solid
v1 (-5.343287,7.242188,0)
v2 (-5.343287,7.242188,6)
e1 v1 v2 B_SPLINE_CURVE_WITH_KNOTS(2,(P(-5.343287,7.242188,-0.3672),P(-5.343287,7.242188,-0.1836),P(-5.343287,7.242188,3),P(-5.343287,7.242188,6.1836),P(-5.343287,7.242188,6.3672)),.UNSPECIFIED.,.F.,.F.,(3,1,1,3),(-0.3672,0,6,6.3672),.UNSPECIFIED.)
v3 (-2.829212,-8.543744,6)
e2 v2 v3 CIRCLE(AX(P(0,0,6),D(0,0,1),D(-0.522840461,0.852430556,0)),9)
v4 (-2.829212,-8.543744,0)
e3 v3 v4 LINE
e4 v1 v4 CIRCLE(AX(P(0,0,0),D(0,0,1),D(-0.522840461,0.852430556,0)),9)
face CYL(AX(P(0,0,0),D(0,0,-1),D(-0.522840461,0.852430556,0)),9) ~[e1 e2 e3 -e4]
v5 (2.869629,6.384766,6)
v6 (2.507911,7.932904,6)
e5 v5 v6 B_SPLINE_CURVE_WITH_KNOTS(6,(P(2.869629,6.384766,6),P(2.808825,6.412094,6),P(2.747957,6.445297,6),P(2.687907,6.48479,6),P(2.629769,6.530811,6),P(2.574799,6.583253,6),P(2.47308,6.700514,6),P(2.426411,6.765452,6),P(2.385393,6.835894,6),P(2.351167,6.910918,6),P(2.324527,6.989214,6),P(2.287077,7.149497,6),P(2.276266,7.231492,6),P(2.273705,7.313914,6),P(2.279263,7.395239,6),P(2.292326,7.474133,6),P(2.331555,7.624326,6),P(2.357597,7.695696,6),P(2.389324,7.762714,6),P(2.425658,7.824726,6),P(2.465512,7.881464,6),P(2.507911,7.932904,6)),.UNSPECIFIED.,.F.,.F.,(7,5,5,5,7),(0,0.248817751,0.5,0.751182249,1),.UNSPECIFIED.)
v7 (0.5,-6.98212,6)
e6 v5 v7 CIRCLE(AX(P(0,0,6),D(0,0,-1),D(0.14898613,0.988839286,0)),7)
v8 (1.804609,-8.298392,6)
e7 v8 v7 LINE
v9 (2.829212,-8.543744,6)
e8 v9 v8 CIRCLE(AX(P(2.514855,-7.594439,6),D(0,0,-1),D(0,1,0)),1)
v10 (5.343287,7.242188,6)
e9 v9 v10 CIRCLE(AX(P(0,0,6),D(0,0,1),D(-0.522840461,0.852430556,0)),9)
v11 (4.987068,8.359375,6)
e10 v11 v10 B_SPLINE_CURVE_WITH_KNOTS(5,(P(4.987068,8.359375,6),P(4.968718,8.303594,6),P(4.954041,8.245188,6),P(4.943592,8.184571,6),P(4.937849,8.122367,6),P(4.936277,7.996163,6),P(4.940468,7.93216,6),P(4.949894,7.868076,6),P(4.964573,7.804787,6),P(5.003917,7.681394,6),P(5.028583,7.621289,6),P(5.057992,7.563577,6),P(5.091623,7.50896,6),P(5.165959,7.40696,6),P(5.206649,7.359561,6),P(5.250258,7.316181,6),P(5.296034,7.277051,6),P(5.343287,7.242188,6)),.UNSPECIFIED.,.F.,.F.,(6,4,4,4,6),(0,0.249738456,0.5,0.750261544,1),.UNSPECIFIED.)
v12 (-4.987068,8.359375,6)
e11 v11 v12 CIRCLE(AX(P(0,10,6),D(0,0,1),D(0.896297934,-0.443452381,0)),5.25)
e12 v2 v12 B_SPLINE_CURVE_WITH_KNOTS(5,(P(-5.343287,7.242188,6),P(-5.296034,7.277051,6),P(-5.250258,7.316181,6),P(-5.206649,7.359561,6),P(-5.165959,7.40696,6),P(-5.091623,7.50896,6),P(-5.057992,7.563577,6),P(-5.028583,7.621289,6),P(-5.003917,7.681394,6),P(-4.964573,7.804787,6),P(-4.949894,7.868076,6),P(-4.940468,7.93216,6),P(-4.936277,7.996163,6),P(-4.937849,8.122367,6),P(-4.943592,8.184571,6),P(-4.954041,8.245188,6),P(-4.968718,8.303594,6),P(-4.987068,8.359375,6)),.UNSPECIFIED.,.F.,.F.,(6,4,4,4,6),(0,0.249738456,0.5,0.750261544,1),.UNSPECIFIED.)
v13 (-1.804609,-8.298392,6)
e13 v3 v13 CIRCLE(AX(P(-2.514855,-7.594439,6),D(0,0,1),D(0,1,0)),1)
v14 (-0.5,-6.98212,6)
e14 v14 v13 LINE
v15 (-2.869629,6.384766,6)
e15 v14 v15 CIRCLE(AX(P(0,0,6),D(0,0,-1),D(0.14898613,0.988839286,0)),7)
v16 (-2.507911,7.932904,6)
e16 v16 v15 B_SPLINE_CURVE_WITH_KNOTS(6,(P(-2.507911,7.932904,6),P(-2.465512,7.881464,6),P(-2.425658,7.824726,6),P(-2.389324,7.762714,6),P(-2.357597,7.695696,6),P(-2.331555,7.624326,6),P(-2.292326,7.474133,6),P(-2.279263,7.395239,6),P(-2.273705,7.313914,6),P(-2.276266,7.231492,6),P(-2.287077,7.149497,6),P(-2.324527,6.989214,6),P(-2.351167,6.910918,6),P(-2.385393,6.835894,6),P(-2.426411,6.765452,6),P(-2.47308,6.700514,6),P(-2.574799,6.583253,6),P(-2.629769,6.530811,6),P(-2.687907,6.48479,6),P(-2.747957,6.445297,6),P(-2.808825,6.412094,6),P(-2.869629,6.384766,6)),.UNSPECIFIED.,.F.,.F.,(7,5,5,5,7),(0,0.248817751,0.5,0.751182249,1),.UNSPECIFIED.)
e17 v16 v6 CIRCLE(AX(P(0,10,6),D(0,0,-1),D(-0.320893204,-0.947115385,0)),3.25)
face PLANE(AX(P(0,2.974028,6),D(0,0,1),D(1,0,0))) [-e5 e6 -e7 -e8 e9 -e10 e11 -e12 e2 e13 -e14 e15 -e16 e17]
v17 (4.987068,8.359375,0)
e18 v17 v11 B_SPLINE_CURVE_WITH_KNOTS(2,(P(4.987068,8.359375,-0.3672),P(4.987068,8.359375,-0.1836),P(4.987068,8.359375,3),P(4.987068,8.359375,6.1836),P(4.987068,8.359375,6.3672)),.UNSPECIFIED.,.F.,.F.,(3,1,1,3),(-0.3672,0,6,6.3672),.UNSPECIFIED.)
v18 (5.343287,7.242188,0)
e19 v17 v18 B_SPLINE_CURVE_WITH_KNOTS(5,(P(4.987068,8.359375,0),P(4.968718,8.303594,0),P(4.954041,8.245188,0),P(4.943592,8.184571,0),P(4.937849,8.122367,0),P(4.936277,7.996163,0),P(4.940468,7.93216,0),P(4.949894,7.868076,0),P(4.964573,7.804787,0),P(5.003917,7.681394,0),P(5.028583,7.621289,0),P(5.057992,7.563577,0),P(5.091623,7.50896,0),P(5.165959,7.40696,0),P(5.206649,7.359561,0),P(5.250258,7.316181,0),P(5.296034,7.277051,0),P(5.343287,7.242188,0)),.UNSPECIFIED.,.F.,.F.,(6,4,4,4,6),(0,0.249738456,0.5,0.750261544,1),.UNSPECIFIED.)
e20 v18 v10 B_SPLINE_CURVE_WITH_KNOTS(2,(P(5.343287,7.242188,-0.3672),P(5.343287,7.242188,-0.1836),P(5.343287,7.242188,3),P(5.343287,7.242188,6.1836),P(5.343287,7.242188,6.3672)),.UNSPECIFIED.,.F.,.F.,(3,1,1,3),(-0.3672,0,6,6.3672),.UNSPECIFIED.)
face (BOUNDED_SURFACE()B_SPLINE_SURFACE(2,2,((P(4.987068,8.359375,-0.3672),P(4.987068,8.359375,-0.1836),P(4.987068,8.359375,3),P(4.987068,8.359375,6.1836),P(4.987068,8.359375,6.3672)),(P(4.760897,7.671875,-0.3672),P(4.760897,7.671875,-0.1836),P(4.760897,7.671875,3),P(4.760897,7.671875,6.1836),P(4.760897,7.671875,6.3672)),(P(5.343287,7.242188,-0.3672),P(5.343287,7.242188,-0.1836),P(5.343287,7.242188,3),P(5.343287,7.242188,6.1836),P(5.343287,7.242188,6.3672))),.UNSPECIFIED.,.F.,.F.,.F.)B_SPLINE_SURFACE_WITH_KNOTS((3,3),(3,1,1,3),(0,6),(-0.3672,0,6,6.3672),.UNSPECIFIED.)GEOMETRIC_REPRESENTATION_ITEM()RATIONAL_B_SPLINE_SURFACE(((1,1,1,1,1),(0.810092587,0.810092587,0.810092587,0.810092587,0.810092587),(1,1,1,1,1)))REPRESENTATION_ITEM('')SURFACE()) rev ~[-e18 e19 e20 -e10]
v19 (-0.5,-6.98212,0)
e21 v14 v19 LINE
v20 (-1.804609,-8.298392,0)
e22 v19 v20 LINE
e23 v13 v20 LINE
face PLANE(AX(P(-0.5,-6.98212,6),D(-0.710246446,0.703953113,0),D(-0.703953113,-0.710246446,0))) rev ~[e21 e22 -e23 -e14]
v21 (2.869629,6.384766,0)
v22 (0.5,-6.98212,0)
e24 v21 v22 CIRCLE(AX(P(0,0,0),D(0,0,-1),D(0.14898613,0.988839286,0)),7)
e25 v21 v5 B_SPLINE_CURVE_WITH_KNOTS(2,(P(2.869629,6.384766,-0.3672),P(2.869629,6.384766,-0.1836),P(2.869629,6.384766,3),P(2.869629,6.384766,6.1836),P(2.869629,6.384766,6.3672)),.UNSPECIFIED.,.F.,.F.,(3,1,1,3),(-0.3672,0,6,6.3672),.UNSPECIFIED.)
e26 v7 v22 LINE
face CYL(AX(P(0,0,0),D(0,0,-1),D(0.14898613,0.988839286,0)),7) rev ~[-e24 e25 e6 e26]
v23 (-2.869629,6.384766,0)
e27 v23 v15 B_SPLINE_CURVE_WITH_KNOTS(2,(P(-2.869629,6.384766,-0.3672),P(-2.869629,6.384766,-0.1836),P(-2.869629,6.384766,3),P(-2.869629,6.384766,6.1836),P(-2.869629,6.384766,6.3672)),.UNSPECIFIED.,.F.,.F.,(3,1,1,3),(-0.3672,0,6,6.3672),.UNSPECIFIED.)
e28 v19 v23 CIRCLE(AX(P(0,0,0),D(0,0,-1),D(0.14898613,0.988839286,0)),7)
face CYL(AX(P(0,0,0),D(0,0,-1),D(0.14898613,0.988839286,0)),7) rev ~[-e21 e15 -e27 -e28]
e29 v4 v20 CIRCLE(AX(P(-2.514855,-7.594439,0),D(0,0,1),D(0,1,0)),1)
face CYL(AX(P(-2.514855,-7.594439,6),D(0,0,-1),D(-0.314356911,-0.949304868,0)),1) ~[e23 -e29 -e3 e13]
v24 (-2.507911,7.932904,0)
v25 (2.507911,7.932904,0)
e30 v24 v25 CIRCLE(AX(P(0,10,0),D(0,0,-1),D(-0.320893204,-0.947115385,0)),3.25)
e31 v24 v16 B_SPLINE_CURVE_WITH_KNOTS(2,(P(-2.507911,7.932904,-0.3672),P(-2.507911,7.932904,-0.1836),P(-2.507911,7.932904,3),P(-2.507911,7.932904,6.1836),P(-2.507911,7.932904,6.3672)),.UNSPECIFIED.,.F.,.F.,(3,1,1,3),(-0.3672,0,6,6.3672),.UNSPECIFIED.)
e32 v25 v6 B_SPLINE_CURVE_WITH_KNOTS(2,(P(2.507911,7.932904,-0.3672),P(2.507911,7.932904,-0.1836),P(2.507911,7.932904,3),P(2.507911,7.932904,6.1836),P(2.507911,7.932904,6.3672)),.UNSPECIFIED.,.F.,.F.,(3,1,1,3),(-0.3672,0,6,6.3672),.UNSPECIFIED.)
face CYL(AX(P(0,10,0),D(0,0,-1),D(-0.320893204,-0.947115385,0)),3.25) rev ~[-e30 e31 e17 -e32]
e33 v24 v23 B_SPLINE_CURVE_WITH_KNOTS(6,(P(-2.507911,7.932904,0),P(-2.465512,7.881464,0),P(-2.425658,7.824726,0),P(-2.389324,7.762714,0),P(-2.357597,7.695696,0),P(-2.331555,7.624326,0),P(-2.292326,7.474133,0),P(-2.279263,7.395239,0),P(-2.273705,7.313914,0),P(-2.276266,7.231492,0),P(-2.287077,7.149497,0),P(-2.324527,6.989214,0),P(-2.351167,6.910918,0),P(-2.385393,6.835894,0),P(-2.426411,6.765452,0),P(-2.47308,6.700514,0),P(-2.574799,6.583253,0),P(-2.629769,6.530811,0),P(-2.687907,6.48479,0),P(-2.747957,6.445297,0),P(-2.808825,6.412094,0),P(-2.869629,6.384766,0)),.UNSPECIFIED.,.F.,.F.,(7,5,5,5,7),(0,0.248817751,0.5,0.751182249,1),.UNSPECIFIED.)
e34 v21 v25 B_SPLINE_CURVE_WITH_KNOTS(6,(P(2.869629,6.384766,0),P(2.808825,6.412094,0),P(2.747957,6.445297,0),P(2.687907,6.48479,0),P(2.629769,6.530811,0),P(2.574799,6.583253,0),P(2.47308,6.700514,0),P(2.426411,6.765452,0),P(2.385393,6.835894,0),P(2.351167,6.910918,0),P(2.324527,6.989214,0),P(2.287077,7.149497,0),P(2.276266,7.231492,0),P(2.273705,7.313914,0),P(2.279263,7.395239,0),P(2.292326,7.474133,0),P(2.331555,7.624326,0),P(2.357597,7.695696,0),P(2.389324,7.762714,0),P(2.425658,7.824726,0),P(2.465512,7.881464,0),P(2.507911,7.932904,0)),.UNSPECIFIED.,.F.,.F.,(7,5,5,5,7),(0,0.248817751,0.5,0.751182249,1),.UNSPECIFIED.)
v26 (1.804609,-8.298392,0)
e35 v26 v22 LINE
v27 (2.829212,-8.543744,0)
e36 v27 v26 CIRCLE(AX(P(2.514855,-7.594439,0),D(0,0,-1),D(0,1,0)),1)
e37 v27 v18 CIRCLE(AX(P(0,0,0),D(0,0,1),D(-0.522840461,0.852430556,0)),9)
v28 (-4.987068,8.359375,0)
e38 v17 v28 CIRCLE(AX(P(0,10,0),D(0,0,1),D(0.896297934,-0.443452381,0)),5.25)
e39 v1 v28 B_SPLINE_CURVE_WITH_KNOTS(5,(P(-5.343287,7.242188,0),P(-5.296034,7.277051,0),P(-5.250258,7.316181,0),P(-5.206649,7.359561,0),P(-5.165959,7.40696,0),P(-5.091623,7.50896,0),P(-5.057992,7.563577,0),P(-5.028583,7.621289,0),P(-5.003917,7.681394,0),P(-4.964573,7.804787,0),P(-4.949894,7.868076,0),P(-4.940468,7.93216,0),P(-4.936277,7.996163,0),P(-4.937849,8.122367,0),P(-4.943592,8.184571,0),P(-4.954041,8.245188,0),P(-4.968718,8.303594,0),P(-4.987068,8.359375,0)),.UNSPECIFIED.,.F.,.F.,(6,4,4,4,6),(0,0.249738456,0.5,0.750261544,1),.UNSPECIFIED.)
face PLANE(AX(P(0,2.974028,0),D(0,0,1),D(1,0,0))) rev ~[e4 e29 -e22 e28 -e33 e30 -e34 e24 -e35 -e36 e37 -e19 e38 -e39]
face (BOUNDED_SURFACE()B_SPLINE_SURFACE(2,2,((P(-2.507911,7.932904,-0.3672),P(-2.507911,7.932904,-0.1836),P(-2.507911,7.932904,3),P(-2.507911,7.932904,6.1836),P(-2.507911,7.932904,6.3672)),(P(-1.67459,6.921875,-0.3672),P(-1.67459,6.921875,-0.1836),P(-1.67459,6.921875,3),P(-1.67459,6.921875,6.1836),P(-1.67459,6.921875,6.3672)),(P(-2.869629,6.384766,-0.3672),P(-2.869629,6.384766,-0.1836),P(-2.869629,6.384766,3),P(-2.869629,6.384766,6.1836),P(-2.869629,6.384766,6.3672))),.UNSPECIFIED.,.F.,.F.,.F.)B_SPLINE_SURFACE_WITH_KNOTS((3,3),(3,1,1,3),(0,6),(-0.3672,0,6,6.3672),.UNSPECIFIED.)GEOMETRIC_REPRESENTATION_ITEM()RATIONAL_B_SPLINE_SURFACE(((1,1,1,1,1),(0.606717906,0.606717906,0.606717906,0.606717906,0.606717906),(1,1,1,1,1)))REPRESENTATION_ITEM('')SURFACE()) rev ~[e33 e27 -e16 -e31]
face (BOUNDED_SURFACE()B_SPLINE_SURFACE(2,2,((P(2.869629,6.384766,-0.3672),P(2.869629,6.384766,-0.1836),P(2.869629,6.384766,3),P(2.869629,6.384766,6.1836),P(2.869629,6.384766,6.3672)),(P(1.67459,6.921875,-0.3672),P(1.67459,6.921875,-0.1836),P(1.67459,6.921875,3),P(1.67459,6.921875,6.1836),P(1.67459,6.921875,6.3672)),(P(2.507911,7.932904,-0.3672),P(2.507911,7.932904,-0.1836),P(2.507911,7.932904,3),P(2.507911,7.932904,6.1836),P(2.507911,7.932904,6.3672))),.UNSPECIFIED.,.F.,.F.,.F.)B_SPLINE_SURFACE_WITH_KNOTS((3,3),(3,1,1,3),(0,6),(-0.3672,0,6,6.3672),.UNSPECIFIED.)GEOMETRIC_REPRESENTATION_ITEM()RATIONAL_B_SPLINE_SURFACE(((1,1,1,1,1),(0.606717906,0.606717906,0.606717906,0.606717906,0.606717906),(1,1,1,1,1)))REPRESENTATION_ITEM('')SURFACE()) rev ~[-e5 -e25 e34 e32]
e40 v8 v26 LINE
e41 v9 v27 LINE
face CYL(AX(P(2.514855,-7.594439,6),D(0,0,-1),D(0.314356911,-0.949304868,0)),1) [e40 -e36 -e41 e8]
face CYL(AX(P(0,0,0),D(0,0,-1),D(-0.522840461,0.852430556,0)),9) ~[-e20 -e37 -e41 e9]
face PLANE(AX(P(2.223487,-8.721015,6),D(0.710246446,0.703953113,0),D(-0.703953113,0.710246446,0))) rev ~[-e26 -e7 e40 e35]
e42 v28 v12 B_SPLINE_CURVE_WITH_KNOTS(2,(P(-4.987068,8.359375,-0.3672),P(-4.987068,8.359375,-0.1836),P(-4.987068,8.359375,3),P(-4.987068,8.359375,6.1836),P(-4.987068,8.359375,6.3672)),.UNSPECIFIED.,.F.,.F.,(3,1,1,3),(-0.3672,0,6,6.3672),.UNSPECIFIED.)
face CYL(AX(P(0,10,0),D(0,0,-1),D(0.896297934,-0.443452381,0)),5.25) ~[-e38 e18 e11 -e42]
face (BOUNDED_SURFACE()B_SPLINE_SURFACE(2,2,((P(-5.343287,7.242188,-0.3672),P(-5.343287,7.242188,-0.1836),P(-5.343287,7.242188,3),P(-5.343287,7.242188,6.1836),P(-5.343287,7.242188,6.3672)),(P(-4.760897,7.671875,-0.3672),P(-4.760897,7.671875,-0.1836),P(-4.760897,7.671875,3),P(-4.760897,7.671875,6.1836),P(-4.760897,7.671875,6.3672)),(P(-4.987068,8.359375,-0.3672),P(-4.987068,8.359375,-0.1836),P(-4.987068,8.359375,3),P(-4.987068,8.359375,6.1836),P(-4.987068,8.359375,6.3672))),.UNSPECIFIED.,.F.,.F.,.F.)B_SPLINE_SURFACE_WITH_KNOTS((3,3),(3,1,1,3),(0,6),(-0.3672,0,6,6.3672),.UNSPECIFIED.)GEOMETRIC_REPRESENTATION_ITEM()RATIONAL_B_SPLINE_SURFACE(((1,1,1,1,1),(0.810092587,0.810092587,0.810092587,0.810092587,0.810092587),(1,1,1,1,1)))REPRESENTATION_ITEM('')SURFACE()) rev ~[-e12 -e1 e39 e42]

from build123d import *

# Parameters (mm, degrees)
F1_DEPTH = 6
F3_DEPTH = 6.001
F4_R     = 1


with BuildPart() as f1:
    # F0 (on Top) → F1 (new body)
    with BuildSketch(Plane.XY):
        with BuildLine():
            ThreePointArc((-4.7055641516, 7.671875), (0, -9), (4.7055641516, 7.671875))
            ThreePointArc((4.7055641516, 7.671875), (0, 15.25), (-4.7055641516, 7.671875))
        make_face()
        with BuildLine():
            ThreePointArc((1.0429029122, 6.921875), (0, -7), (-1.0429029122, 6.921875))
            ThreePointArc((-1.0429029122, 6.921875), (0, 13.25), (1.0429029122, 6.921875))
        make_face(mode=Mode.SUBTRACT)
    extrude(amount=F1_DEPTH)

    # F2 (on face) → F3 (cut, through all)
    with BuildSketch(Plane.XY.offset(6)):
        with BuildLine():
            ThreePointArc((0.5, -6.9821200219), (0, -7), (-0.5, -6.9821200219))
            Line((-0.5, -6.9821200219), (-2.2234871513, -8.7210151294))
            ThreePointArc((-2.2234871513, -8.7210151294), (-1.1204605827, -8.9299814156), (0, -9))
            ThreePointArc((0, -9), (1.1204605827, -8.9299814156), (2.2234871513, -8.7210151294))
            Line((2.2234871513, -8.7210151294), (0.5, -6.9821200219))
        make_face()
    extrude(amount=-F3_DEPTH, mode=Mode.SUBTRACT)

    # F4
    f4_edges = [f1.edges().sort_by_distance(p)[0] for p in [
        (-1.042903, 6.921875, 3),
        (4.705564, 7.671875, 3),
        (2.223487, -8.721015, 3),
        (-2.223487, -8.721015, 3),
        (-4.705564, 7.671875, 3),
        (1.042903, 6.921875, 3),
    ]]
    fillet(f4_edges, radius=F4_R)


solid = f1.part
